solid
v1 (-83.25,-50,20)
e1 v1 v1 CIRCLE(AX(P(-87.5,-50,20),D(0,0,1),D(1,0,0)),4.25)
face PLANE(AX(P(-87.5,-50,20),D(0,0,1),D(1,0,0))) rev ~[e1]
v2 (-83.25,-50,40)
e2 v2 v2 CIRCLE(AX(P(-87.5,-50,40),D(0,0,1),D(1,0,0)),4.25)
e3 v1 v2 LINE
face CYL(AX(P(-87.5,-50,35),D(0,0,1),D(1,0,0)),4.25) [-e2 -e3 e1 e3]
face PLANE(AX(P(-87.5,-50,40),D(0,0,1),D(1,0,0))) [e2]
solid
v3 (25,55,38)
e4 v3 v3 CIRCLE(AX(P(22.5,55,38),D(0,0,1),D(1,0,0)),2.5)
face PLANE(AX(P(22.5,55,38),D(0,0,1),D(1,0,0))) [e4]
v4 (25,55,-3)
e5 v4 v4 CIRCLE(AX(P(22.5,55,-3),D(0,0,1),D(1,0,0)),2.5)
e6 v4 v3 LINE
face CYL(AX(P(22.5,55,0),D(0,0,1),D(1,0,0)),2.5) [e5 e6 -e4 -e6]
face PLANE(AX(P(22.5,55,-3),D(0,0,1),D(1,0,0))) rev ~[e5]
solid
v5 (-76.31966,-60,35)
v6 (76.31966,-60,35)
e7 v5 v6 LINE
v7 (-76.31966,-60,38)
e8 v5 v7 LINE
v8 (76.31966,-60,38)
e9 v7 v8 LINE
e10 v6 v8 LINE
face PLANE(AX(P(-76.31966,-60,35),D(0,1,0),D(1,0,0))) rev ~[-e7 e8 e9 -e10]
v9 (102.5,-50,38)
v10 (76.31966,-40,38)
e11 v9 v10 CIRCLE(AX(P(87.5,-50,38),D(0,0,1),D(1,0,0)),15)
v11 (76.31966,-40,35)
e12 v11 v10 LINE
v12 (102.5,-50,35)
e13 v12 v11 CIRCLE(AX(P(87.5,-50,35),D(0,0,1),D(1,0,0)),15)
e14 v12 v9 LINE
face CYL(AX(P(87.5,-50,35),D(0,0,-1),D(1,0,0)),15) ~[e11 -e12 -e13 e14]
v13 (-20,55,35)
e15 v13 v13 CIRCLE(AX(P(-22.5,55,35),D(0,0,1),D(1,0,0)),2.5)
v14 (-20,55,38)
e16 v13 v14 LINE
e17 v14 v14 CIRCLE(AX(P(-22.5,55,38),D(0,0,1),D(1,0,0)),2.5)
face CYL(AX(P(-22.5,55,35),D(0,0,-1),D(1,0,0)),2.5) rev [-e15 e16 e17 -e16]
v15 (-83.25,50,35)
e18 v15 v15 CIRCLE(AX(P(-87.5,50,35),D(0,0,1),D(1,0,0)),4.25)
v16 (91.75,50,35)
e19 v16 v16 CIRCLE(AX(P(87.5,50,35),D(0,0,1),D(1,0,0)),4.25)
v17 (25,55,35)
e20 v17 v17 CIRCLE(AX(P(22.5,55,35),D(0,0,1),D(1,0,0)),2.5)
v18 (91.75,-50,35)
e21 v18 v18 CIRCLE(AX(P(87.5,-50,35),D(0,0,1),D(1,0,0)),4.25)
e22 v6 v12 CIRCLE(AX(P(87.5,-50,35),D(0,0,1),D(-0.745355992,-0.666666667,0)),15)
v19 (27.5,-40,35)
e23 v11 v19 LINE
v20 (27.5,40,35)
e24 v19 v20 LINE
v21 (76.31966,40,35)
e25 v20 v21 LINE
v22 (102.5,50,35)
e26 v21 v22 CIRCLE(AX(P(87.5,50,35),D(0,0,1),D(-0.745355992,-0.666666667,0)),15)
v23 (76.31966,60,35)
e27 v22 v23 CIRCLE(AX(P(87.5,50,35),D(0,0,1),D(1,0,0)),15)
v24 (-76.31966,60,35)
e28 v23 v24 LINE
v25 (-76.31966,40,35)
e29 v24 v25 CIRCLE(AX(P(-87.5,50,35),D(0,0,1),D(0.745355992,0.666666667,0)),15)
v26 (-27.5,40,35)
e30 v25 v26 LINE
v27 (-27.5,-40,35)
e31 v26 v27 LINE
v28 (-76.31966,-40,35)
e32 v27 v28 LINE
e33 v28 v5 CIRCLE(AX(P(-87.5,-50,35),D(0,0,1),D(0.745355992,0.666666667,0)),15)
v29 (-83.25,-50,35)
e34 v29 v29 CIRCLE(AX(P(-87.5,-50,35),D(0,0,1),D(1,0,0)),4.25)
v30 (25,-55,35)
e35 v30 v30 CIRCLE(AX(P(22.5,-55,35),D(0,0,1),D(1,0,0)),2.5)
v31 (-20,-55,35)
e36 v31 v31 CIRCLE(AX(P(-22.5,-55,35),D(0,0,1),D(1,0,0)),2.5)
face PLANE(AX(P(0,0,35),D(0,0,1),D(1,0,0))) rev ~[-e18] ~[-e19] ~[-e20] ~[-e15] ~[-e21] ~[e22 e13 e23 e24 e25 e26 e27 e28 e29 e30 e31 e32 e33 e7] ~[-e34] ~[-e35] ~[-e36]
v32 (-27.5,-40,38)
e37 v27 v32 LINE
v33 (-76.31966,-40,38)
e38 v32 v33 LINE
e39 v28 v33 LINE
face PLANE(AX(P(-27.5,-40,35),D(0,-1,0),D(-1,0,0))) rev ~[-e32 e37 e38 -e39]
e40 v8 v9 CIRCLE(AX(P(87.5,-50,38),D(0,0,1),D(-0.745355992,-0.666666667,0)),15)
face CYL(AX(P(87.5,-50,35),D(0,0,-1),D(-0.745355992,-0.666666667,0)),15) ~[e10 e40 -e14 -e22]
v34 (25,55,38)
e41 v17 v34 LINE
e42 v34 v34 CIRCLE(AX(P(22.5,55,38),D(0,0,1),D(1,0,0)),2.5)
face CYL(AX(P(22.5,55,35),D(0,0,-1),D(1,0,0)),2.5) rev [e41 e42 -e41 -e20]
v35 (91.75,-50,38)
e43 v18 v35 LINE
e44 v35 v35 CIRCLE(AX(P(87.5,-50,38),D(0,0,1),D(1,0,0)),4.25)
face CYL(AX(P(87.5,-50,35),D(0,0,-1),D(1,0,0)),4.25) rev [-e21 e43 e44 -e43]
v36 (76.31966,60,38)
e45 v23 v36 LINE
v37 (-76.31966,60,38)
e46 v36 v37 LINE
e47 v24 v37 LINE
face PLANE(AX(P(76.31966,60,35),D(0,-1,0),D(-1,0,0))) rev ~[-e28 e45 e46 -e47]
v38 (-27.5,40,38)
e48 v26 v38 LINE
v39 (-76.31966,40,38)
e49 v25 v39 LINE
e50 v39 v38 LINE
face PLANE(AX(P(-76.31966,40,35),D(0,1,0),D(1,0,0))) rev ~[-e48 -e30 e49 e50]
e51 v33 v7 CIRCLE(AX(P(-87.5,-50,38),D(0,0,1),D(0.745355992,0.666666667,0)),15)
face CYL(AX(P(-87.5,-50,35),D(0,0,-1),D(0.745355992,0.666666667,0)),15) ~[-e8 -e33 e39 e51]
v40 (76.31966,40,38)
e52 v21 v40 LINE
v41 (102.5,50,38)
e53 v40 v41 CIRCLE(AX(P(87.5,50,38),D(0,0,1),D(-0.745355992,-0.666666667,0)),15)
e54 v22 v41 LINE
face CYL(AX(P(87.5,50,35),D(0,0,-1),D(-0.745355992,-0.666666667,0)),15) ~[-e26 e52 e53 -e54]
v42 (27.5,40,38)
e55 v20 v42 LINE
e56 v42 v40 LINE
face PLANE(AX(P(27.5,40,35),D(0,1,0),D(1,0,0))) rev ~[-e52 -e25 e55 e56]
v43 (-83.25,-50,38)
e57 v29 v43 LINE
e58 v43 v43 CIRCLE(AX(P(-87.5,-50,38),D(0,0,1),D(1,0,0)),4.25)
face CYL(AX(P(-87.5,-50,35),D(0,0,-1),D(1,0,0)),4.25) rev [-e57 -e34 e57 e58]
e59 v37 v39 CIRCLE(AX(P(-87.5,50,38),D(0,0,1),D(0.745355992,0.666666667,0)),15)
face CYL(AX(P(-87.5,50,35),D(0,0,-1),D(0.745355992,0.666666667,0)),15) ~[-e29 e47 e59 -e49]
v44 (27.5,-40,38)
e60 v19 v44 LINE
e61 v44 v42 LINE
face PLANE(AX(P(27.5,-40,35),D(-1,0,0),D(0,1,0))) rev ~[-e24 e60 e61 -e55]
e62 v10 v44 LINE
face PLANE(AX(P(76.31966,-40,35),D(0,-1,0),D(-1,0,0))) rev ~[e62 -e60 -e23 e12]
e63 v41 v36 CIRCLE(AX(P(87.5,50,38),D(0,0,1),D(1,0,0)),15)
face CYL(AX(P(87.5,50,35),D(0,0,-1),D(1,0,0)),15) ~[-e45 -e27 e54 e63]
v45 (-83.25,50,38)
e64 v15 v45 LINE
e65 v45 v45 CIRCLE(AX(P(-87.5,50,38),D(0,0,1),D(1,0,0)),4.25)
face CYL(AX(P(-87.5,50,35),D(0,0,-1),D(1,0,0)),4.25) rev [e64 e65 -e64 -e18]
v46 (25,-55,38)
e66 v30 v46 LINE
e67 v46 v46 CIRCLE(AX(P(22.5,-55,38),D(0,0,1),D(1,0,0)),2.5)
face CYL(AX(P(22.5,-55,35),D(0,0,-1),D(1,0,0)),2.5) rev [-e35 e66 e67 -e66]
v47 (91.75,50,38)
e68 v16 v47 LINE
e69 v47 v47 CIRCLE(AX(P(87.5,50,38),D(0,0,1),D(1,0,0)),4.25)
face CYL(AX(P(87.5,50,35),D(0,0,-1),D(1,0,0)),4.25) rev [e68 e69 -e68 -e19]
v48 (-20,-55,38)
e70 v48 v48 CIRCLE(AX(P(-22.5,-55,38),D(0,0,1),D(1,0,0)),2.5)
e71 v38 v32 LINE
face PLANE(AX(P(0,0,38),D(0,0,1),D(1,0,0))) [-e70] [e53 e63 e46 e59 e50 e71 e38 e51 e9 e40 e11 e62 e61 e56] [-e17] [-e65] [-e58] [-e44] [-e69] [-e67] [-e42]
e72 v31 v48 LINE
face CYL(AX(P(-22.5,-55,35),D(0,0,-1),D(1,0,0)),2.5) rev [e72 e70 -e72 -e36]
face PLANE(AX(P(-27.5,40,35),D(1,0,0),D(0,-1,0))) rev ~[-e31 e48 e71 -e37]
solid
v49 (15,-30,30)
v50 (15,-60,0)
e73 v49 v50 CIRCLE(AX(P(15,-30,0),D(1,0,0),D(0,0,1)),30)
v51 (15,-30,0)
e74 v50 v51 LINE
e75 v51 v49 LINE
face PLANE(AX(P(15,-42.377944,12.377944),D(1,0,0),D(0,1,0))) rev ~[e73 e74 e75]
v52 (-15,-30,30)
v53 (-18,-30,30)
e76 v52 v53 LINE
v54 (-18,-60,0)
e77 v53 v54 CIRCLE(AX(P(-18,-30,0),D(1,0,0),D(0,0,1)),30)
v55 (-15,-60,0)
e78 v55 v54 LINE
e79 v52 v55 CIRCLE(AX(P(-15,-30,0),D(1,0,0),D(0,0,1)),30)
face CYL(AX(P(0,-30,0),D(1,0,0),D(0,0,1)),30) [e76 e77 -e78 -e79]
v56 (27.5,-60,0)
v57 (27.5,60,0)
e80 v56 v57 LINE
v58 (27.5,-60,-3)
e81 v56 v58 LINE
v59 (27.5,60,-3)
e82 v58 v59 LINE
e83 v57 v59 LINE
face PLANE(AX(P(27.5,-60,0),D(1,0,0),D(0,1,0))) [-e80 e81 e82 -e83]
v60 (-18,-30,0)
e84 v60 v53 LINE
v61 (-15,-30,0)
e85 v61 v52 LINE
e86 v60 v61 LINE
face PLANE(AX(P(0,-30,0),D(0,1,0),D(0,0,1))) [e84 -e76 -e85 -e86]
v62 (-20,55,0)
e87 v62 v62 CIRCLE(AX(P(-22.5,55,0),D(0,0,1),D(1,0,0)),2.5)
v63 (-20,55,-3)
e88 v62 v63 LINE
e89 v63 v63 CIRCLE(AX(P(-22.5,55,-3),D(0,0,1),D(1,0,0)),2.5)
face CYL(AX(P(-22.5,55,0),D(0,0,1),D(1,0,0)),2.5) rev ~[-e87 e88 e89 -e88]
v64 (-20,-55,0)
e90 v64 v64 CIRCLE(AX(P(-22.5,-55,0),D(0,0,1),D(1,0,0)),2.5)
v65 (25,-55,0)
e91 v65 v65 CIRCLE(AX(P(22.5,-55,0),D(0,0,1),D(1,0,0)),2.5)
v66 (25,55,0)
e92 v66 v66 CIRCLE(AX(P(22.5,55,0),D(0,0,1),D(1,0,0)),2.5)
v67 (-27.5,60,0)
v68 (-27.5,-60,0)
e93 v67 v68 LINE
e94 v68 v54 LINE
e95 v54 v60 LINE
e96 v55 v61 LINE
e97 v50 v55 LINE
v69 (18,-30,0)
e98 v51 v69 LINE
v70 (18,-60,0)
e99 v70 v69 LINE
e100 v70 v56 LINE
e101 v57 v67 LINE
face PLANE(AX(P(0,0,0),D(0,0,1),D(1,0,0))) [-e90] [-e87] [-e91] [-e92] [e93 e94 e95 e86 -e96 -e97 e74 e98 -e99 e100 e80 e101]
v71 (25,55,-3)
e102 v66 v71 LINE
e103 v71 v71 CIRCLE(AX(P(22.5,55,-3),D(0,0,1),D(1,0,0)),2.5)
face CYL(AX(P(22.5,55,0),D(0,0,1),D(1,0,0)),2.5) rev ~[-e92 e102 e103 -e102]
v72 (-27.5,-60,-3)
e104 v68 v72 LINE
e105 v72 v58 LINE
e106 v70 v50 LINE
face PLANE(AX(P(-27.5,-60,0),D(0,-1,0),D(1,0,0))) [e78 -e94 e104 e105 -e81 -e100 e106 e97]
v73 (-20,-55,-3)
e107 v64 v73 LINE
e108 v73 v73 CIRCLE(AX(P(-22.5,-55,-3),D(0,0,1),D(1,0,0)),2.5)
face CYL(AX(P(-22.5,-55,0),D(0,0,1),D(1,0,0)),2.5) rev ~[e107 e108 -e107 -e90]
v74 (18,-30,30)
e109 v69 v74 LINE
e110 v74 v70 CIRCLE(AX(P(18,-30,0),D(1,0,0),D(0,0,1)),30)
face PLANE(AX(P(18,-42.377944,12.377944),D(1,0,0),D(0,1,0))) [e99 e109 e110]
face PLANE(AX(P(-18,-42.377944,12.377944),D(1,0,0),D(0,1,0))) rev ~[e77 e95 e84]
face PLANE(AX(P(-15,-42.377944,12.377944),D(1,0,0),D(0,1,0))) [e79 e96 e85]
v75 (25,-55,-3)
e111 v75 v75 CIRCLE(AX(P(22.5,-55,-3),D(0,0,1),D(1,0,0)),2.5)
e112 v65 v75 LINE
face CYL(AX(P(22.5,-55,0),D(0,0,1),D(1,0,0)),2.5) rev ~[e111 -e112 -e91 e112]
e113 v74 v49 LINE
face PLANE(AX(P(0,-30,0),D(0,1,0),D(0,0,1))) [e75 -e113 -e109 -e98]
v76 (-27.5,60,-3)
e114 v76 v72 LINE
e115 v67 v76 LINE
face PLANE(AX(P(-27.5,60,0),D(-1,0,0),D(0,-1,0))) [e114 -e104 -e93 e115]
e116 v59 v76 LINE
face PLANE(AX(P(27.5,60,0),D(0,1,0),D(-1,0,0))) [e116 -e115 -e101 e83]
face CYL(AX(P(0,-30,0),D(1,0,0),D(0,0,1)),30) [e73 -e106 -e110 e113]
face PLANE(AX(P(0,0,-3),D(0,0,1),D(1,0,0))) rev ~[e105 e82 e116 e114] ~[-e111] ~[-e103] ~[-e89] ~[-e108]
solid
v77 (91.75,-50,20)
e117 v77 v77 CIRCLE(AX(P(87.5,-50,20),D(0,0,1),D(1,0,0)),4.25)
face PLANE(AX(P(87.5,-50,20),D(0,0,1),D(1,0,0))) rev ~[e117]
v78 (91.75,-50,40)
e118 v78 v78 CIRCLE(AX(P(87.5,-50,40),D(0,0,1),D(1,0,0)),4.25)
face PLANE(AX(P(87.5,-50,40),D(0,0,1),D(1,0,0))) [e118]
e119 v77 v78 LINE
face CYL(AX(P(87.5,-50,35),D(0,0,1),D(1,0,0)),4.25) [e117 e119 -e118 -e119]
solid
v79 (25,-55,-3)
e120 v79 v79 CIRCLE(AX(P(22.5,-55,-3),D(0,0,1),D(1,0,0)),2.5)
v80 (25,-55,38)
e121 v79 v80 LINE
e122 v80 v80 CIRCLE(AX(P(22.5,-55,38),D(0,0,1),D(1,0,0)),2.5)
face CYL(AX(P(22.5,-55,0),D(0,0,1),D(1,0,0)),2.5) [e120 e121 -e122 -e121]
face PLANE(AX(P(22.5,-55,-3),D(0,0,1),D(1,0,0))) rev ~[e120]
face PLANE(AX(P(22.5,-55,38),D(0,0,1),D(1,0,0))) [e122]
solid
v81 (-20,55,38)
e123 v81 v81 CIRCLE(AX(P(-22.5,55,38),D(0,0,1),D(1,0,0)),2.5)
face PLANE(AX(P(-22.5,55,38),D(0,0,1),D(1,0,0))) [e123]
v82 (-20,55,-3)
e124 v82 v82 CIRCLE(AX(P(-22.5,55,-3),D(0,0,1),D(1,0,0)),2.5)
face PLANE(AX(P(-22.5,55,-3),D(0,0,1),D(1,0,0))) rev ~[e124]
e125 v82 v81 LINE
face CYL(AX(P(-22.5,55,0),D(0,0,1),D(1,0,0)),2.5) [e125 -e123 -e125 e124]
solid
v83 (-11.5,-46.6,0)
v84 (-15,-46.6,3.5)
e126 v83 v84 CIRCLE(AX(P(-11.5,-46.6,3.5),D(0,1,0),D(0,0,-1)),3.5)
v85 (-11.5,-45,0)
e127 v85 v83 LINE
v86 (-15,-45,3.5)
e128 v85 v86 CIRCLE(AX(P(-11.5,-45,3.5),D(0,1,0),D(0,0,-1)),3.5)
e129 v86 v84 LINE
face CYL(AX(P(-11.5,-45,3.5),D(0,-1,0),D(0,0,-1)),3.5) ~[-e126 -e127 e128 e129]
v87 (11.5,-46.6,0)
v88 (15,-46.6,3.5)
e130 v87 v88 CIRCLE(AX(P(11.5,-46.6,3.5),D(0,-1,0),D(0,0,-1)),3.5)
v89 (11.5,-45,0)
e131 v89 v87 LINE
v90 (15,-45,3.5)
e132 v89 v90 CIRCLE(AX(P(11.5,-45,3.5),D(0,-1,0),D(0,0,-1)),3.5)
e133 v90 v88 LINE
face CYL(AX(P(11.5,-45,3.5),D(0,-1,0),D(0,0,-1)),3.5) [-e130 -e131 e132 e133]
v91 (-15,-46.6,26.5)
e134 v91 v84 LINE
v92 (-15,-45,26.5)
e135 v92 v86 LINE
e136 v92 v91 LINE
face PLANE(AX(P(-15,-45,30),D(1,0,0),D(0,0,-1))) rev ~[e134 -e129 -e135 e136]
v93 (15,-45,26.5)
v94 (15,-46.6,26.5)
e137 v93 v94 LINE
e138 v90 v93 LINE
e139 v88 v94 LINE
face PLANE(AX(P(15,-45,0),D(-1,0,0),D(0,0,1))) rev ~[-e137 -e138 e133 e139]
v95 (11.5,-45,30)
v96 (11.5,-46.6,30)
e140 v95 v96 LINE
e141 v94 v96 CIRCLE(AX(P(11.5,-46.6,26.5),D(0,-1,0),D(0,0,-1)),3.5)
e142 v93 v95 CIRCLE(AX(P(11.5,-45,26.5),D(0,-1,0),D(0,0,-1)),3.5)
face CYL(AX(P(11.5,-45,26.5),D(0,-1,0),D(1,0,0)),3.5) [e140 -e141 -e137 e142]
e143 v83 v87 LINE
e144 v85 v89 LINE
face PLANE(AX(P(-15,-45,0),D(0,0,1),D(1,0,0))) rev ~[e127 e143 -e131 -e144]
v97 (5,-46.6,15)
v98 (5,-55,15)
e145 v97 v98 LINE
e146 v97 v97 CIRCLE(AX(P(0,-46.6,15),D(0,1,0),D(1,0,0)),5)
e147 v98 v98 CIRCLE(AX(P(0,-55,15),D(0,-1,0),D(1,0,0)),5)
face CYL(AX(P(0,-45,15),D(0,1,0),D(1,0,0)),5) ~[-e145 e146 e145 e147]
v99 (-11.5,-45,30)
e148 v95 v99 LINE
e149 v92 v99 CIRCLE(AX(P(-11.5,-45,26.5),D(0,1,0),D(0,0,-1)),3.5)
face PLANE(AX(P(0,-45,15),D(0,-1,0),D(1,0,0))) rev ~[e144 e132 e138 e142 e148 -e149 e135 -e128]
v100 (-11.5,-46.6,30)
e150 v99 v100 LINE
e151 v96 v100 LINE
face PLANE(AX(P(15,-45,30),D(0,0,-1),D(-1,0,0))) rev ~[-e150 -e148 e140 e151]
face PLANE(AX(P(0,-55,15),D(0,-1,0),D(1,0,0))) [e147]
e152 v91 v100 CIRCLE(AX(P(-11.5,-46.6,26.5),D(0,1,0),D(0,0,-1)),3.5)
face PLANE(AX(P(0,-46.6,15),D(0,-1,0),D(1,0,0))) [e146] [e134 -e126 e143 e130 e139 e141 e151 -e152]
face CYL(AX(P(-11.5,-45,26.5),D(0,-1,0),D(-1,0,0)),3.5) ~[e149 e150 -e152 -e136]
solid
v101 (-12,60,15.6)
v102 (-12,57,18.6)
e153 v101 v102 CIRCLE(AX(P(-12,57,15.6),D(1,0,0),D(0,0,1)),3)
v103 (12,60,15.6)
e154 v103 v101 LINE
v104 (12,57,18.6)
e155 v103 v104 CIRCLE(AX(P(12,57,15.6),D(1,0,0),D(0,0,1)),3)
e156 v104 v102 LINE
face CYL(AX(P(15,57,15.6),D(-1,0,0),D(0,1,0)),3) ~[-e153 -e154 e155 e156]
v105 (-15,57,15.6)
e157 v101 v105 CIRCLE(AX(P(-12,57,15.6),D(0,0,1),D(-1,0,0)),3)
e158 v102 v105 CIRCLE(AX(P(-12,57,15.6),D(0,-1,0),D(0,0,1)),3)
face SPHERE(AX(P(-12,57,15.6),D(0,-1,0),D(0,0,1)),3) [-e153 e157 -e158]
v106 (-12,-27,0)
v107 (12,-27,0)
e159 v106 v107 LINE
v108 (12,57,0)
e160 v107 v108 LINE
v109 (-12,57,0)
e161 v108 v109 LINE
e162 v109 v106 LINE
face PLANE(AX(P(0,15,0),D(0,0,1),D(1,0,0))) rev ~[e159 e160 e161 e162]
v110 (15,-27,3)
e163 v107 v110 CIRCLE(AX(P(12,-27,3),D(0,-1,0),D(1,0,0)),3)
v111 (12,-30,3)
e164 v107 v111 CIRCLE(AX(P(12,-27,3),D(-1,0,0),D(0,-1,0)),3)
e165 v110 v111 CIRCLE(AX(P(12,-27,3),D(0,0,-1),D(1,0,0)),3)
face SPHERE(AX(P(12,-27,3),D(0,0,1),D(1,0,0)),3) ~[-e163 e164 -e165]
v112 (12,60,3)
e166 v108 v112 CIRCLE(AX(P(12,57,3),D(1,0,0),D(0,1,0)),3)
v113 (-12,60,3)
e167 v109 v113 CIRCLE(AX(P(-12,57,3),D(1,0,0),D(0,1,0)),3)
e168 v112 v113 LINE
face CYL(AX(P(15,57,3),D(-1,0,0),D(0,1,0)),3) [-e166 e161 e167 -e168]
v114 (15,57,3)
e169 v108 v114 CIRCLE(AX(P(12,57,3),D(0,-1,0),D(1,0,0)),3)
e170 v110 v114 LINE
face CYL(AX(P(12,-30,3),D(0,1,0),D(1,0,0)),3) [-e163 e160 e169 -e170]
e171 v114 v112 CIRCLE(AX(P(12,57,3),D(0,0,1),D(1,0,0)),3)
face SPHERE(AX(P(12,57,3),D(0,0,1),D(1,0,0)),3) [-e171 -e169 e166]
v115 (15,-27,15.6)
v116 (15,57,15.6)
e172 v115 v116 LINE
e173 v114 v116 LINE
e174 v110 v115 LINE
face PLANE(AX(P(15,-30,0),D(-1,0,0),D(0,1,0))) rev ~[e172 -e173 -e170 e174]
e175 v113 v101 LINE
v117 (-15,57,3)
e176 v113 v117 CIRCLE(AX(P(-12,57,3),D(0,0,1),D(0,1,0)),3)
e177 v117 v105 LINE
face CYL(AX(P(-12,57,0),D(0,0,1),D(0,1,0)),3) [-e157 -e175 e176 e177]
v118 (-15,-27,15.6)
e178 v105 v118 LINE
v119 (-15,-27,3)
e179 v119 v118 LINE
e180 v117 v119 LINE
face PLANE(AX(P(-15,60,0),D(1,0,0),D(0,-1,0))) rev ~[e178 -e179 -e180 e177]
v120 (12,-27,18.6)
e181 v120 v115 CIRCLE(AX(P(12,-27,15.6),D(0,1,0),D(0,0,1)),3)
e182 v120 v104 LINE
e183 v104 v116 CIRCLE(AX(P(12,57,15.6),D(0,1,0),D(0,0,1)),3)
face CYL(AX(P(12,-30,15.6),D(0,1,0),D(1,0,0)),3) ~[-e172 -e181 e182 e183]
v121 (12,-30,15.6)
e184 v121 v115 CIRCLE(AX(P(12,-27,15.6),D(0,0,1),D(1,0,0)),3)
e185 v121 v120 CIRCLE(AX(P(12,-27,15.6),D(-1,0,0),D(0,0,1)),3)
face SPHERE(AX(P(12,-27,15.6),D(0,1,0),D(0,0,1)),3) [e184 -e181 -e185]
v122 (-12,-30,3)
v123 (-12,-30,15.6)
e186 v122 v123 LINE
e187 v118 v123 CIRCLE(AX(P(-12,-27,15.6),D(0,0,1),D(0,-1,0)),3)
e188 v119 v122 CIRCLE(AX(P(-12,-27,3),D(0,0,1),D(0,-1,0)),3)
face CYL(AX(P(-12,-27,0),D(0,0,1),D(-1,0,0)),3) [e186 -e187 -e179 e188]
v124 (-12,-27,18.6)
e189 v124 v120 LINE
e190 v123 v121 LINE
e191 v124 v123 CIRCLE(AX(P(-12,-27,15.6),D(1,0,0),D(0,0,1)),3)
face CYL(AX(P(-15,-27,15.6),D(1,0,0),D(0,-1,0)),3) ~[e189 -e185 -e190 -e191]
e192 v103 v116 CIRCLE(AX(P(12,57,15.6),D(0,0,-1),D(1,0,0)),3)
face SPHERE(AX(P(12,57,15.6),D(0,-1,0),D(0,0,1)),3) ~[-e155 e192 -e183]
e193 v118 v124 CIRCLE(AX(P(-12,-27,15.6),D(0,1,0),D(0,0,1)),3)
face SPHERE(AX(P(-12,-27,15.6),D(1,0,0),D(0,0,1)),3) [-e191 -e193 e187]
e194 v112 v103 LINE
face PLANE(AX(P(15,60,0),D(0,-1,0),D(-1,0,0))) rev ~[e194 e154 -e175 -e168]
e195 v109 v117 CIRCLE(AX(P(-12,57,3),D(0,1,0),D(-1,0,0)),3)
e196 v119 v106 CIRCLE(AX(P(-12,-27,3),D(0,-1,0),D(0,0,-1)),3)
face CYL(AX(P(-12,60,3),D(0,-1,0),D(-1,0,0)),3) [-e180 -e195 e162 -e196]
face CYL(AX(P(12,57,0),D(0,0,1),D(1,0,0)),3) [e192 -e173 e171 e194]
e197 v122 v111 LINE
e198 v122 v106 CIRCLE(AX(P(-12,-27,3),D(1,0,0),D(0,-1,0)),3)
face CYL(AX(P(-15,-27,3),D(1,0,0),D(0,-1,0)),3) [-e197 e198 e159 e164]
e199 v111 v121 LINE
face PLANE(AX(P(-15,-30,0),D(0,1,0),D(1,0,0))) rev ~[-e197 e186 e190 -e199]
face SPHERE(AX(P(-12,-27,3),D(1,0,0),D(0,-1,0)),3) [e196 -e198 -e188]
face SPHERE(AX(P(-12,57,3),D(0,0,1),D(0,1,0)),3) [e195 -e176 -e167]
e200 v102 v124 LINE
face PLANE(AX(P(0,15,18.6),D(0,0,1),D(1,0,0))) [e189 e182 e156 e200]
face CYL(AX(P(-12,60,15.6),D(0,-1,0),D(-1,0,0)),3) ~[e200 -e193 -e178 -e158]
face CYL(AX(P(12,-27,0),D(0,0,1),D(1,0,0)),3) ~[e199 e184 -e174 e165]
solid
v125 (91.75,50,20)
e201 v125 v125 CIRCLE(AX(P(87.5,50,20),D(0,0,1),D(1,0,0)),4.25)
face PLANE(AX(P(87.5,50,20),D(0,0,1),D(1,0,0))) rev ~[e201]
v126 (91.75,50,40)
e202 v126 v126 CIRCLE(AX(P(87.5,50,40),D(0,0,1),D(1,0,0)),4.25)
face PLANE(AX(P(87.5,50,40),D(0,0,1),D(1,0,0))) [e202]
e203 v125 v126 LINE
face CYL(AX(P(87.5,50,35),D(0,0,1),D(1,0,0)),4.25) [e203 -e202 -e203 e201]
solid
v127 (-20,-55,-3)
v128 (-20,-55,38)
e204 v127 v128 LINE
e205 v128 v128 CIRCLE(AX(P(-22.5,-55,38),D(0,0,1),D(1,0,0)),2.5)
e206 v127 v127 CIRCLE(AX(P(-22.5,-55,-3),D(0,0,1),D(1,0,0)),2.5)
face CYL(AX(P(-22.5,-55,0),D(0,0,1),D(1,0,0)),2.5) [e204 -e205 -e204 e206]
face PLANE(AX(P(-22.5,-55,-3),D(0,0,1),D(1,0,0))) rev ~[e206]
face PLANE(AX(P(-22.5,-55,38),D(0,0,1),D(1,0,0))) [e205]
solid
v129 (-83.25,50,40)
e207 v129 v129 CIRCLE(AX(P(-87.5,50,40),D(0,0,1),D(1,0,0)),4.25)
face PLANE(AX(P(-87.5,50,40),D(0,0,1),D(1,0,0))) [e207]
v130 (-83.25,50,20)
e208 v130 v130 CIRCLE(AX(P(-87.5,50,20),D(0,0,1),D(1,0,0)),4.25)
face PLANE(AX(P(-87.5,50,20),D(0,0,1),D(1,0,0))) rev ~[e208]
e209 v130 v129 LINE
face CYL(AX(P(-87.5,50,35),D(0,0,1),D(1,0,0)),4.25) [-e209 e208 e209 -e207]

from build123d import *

# Parameters (mm, degrees)
F2_R          = 2.5
F2_R_2        = 4.25
F3_DEPTH      = 3
F0_R          = 2.5
F4_DEPTH      = 3
F5_DEPTH      = 38
F5_DEPTH_BACK = 3
F6_DEPTH      = 5
F6_DEPTH_BACK = 15
F8_DEPTH      = 18
F9_DEPTH      = 15
F12_START     = 15
F11_R         = 5
F12_DEPTH     = 1.6
F13_START     = 15
F13_DEPTH     = 10
F14_R         = 3.5
F15_DEPTH     = 18.6
F16_R         = 3


with BuildPart() as f3:
    # F2 (on offset) → F3 (new body)
    with BuildSketch(Plane.XY.offset(35)):
        Polygon((-27.5, -60), (27.5, -60), (27.5, -40), (27.5, 40), (27.5, 60), (-27.5, 60), (-27.5, 55), (-27.5, 40), (-27.5, -40), align=None)
        with Locations((-22.5, -55)):
            Circle(F2_R, mode=Mode.SUBTRACT)
        with Locations((22.5, -55)):
            Circle(F2_R, mode=Mode.SUBTRACT)
        with Locations((-22.5, 55)):
            Circle(F2_R, mode=Mode.SUBTRACT)
        with Locations((22.5, 55)):
            Circle(F2_R, mode=Mode.SUBTRACT)
        with BuildLine():
            Line((27.5, -40), (27.5, -60))
            Line((27.5, -60), (76.3196601125, -60))
            ThreePointArc((76.3196601125, -60), (72.5, -50), (76.3196601125, -40))
            Line((76.3196601125, -40), (27.5, -40))
        make_face()
        with BuildLine():
            Line((-76.3196601125, -60), (-27.5, -60))
            Line((-27.5, -60), (-27.5, -40))
            Line((-27.5, -40), (-76.3196601125, -40))
            ThreePointArc((-76.3196601125, -40), (-73.4874146156, -44.6476686534), (-72.5, -50))
            ThreePointArc((-72.5, -50), (-73.4874146156, -55.3523313466), (-76.3196601125, -60))
        make_face()
        with BuildLine():
            ThreePointArc((76.3196601125, -40), (72.5, -50), (76.3196601125, -60))
            ThreePointArc((76.3196601125, -60), (92.8523313466, -64.0125853844), (102.5, -50))
            ThreePointArc((102.5, -50), (92.8523313466, -35.9874146156), (76.3196601125, -40))
        make_face()
        with Locations((87.5, -50)):
            Circle(F2_R_2, mode=Mode.SUBTRACT)
        with BuildLine():
            ThreePointArc((-76.3196601125, -40), (-102.5, -50), (-76.3196601125, -60))
            ThreePointArc((-76.3196601125, -60), (-73.4874146156, -55.3523313466), (-72.5, -50))
            ThreePointArc((-72.5, -50), (-73.4874146156, -44.6476686534), (-76.3196601125, -40))
        make_face()
        with Locations((-87.5, -50)):
            Circle(F2_R_2, mode=Mode.SUBTRACT)
        with BuildLine():
            Line((27.5, 60), (27.5, 40))
            Line((27.5, 40), (76.3196601125, 40))
            ThreePointArc((76.3196601125, 40), (72.5, 50), (76.3196601125, 60))
            Line((76.3196601125, 60), (27.5, 60))
        make_face()
        with BuildLine():
            Line((-76.3196601125, 40), (-27.5, 40))
            Line((-27.5, 40), (-27.5, 55))
            Line((-27.5, 55), (-27.5, 60))
            Line((-27.5, 60), (-76.3196601125, 60))
            ThreePointArc((-76.3196601125, 60), (-73.4874146156, 55.3523313466), (-72.5, 50))
            ThreePointArc((-72.5, 50), (-73.4874146156, 44.6476686534), (-76.3196601125, 40))
        make_face()
        with BuildLine():
            ThreePointArc((76.3196601125, 60), (72.5, 50), (76.3196601125, 40))
            ThreePointArc((76.3196601125, 40), (92.8523313466, 35.9874146156), (102.5, 50))
            ThreePointArc((102.5, 50), (92.8523313466, 64.0125853844), (76.3196601125, 60))
        make_face()
        with Locations((87.5, 50)):
            Circle(F2_R_2, mode=Mode.SUBTRACT)
        with BuildLine():
            ThreePointArc((-76.3196601125, 60), (-102.5, 50), (-76.3196601125, 40))
            ThreePointArc((-76.3196601125, 40), (-73.4874146156, 44.6476686534), (-72.5, 50))
            ThreePointArc((-72.5, 50), (-73.4874146156, 55.3523313466), (-76.3196601125, 60))
        make_face()
        with Locations((-87.5, 50)):
            Circle(F2_R_2, mode=Mode.SUBTRACT)
    extrude(amount=F3_DEPTH)


with BuildPart() as f4:
    # F0 (on Top) → F4 (new body)
    with BuildSketch(Plane.XY):
        Polygon((-27.5, -60), (27.5, -60), (27.5, 60), (15, 60), (15, -30), (-15, -30), (-15, 60), (-27.5, 60), (-27.5, 55), align=None)
        with Locations((-22.5, -55)):
            Circle(F0_R, mode=Mode.SUBTRACT)
        with Locations((22.5, -55)):
            Circle(F0_R, mode=Mode.SUBTRACT)
        with Locations((-22.5, 55)):
            Circle(F0_R, mode=Mode.SUBTRACT)
        with Locations((22.5, 55)):
            Circle(F0_R, mode=Mode.SUBTRACT)
        Polygon((15, -30), (15, 60), (0, 60), (-15, 60), (-15, -30), align=None)
    extrude(amount=-F4_DEPTH)

    # F7 (on Right) → F8 (join, symmetric)
    with BuildSketch(Plane.YZ):
        with BuildLine():
            Line((-60, 0), (-30, 0))
            Line((-30, 0), (-30, 30))
            ThreePointArc((-30, 30), (-51.2132034356, 21.2132034356), (-60, 0))
        make_face()
    extrude(amount=F8_DEPTH, both=True)

    # F7 (on Right) → F9 (cut, symmetric)
    with BuildSketch(Plane.YZ):
        with BuildLine():
            Line((-60, 0), (-30, 0))
            Line((-30, 0), (-30, 30))
            ThreePointArc((-30, 30), (-51.2132034356, 21.2132034356), (-60, 0))
        make_face()
    extrude(amount=F9_DEPTH, both=True, mode=Mode.SUBTRACT)


with BuildPart() as f5:
    # F0 (on Top) → F5 (new body, two sides)
    with BuildSketch(Plane.XY) as f5_sk:
        with Locations((-22.5, 55)):
            Circle(F0_R)
    extrude(amount=F5_DEPTH)
    extrude(f5_sk.sketch, amount=-F5_DEPTH_BACK)


with BuildPart() as f5b:
    # F0 (on Top) → F5, piece 2 (new body, two sides)
    with BuildSketch(Plane.XY) as f5_2_sk:
        with Locations((22.5, 55)):
            Circle(F0_R)
    extrude(amount=F5_DEPTH)
    extrude(f5_2_sk.sketch, amount=-F5_DEPTH_BACK)


with BuildPart() as f5c:
    # F0 (on Top) → F5, piece 3 (new body, two sides)
    with BuildSketch(Plane.XY) as f5_3_sk:
        with Locations((22.5, -55)):
            Circle(F0_R)
    extrude(amount=F5_DEPTH)
    extrude(f5_3_sk.sketch, amount=-F5_DEPTH_BACK)


with BuildPart() as f5d:
    # F0 (on Top) → F5, piece 4 (new body, two sides)
    with BuildSketch(Plane.XY) as f5_4_sk:
        with Locations((-22.5, -55)):
            Circle(F0_R)
    extrude(amount=F5_DEPTH)
    extrude(f5_4_sk.sketch, amount=-F5_DEPTH_BACK)


with BuildPart() as f6:
    # F2 (on offset) → F6 (new body, two sides)
    with BuildSketch(Plane.XY.offset(35)) as f6_sk:
        with Locations((-87.5, -50)):
            Circle(F2_R_2)
    extrude(amount=F6_DEPTH)
    extrude(f6_sk.sketch, amount=-F6_DEPTH_BACK)


with BuildPart() as f6b:
    # F2 (on offset) → F6, piece 2 (new body, two sides)
    with BuildSketch(Plane.XY.offset(35)) as f6_2_sk:
        with Locations((87.5, -50)):
            Circle(F2_R_2)
    extrude(amount=F6_DEPTH)
    extrude(f6_2_sk.sketch, amount=-F6_DEPTH_BACK)


with BuildPart() as f6c:
    # F2 (on offset) → F6, piece 3 (new body, two sides)
    with BuildSketch(Plane.XY.offset(35)) as f6_3_sk:
        with Locations((-87.5, 50)):
            Circle(F2_R_2)
    extrude(amount=F6_DEPTH)
    extrude(f6_3_sk.sketch, amount=-F6_DEPTH_BACK)


with BuildPart() as f6d:
    # F2 (on offset) → F6, piece 4 (new body, two sides)
    with BuildSketch(Plane.XY.offset(35)) as f6_4_sk:
        with Locations((87.5, 50)):
            Circle(F2_R_2)
    extrude(amount=F6_DEPTH)
    extrude(f6_4_sk.sketch, amount=-F6_DEPTH_BACK)


with BuildPart() as f12:
    # F11 (on line) → F12 (new body)
    with BuildSketch(Plane.XZ.offset(30).offset(F12_START)):
        Polygon((-15, 0), (0, 0), (15, 0), (15, 30), (-15, 30), align=None)
        with Locations((0, 15)):
            Circle(F11_R, mode=Mode.SUBTRACT)
        with Locations((0, 15)):
            Circle(F11_R)
    extrude(amount=F12_DEPTH)

    # F11 (on line) → F13 (join)
    with BuildSketch(Plane.XZ.offset(30).offset(F13_START)):
        with Locations((0, 15)):
            Circle(F11_R)
    extrude(amount=F13_DEPTH)

    # F14
    f14_edges = [f12.edges().sort_by_distance(p)[0] for p in [
        (-15, -45.8, 0),
        (-15, -45.8, 30),
        (15, -45.8, 30),
        (15, -45.8, 0),
    ]]
    fillet(f14_edges, radius=F14_R)


with BuildPart() as f15:
    # F0 (on Top) → F15 (new body)
    with BuildSketch(Plane.XY):
        Polygon((15, -30), (15, 60), (0, 60), (-15, 60), (-15, -30), align=None)
    extrude(amount=F15_DEPTH)

    # F16
    f16_edges = [f15.edges().sort_by_distance(p)[0] for p in [
        (15, 15, 18.6),
        (0, -30, 18.6),
        (-15, 15, 18.6),
        (0, 60, 18.6),
        (-15, 60, 9.3),
        (15, 60, 9.3),
        (15, -30, 9.3),
        (15, 15, 0),
        (0, 60, 0),
        (0, -30, 0),
        (-15, -30, 9.3),
        (-15, 15, 0),
    ]]
    fillet(f16_edges, radius=F16_R)


solid = Compound([f3.part, f4.part, f5.part, f5b.part, f5c.part, f5d.part, f6.part, f6b.part, f6c.part, f6d.part, f12.part, f15.part])
